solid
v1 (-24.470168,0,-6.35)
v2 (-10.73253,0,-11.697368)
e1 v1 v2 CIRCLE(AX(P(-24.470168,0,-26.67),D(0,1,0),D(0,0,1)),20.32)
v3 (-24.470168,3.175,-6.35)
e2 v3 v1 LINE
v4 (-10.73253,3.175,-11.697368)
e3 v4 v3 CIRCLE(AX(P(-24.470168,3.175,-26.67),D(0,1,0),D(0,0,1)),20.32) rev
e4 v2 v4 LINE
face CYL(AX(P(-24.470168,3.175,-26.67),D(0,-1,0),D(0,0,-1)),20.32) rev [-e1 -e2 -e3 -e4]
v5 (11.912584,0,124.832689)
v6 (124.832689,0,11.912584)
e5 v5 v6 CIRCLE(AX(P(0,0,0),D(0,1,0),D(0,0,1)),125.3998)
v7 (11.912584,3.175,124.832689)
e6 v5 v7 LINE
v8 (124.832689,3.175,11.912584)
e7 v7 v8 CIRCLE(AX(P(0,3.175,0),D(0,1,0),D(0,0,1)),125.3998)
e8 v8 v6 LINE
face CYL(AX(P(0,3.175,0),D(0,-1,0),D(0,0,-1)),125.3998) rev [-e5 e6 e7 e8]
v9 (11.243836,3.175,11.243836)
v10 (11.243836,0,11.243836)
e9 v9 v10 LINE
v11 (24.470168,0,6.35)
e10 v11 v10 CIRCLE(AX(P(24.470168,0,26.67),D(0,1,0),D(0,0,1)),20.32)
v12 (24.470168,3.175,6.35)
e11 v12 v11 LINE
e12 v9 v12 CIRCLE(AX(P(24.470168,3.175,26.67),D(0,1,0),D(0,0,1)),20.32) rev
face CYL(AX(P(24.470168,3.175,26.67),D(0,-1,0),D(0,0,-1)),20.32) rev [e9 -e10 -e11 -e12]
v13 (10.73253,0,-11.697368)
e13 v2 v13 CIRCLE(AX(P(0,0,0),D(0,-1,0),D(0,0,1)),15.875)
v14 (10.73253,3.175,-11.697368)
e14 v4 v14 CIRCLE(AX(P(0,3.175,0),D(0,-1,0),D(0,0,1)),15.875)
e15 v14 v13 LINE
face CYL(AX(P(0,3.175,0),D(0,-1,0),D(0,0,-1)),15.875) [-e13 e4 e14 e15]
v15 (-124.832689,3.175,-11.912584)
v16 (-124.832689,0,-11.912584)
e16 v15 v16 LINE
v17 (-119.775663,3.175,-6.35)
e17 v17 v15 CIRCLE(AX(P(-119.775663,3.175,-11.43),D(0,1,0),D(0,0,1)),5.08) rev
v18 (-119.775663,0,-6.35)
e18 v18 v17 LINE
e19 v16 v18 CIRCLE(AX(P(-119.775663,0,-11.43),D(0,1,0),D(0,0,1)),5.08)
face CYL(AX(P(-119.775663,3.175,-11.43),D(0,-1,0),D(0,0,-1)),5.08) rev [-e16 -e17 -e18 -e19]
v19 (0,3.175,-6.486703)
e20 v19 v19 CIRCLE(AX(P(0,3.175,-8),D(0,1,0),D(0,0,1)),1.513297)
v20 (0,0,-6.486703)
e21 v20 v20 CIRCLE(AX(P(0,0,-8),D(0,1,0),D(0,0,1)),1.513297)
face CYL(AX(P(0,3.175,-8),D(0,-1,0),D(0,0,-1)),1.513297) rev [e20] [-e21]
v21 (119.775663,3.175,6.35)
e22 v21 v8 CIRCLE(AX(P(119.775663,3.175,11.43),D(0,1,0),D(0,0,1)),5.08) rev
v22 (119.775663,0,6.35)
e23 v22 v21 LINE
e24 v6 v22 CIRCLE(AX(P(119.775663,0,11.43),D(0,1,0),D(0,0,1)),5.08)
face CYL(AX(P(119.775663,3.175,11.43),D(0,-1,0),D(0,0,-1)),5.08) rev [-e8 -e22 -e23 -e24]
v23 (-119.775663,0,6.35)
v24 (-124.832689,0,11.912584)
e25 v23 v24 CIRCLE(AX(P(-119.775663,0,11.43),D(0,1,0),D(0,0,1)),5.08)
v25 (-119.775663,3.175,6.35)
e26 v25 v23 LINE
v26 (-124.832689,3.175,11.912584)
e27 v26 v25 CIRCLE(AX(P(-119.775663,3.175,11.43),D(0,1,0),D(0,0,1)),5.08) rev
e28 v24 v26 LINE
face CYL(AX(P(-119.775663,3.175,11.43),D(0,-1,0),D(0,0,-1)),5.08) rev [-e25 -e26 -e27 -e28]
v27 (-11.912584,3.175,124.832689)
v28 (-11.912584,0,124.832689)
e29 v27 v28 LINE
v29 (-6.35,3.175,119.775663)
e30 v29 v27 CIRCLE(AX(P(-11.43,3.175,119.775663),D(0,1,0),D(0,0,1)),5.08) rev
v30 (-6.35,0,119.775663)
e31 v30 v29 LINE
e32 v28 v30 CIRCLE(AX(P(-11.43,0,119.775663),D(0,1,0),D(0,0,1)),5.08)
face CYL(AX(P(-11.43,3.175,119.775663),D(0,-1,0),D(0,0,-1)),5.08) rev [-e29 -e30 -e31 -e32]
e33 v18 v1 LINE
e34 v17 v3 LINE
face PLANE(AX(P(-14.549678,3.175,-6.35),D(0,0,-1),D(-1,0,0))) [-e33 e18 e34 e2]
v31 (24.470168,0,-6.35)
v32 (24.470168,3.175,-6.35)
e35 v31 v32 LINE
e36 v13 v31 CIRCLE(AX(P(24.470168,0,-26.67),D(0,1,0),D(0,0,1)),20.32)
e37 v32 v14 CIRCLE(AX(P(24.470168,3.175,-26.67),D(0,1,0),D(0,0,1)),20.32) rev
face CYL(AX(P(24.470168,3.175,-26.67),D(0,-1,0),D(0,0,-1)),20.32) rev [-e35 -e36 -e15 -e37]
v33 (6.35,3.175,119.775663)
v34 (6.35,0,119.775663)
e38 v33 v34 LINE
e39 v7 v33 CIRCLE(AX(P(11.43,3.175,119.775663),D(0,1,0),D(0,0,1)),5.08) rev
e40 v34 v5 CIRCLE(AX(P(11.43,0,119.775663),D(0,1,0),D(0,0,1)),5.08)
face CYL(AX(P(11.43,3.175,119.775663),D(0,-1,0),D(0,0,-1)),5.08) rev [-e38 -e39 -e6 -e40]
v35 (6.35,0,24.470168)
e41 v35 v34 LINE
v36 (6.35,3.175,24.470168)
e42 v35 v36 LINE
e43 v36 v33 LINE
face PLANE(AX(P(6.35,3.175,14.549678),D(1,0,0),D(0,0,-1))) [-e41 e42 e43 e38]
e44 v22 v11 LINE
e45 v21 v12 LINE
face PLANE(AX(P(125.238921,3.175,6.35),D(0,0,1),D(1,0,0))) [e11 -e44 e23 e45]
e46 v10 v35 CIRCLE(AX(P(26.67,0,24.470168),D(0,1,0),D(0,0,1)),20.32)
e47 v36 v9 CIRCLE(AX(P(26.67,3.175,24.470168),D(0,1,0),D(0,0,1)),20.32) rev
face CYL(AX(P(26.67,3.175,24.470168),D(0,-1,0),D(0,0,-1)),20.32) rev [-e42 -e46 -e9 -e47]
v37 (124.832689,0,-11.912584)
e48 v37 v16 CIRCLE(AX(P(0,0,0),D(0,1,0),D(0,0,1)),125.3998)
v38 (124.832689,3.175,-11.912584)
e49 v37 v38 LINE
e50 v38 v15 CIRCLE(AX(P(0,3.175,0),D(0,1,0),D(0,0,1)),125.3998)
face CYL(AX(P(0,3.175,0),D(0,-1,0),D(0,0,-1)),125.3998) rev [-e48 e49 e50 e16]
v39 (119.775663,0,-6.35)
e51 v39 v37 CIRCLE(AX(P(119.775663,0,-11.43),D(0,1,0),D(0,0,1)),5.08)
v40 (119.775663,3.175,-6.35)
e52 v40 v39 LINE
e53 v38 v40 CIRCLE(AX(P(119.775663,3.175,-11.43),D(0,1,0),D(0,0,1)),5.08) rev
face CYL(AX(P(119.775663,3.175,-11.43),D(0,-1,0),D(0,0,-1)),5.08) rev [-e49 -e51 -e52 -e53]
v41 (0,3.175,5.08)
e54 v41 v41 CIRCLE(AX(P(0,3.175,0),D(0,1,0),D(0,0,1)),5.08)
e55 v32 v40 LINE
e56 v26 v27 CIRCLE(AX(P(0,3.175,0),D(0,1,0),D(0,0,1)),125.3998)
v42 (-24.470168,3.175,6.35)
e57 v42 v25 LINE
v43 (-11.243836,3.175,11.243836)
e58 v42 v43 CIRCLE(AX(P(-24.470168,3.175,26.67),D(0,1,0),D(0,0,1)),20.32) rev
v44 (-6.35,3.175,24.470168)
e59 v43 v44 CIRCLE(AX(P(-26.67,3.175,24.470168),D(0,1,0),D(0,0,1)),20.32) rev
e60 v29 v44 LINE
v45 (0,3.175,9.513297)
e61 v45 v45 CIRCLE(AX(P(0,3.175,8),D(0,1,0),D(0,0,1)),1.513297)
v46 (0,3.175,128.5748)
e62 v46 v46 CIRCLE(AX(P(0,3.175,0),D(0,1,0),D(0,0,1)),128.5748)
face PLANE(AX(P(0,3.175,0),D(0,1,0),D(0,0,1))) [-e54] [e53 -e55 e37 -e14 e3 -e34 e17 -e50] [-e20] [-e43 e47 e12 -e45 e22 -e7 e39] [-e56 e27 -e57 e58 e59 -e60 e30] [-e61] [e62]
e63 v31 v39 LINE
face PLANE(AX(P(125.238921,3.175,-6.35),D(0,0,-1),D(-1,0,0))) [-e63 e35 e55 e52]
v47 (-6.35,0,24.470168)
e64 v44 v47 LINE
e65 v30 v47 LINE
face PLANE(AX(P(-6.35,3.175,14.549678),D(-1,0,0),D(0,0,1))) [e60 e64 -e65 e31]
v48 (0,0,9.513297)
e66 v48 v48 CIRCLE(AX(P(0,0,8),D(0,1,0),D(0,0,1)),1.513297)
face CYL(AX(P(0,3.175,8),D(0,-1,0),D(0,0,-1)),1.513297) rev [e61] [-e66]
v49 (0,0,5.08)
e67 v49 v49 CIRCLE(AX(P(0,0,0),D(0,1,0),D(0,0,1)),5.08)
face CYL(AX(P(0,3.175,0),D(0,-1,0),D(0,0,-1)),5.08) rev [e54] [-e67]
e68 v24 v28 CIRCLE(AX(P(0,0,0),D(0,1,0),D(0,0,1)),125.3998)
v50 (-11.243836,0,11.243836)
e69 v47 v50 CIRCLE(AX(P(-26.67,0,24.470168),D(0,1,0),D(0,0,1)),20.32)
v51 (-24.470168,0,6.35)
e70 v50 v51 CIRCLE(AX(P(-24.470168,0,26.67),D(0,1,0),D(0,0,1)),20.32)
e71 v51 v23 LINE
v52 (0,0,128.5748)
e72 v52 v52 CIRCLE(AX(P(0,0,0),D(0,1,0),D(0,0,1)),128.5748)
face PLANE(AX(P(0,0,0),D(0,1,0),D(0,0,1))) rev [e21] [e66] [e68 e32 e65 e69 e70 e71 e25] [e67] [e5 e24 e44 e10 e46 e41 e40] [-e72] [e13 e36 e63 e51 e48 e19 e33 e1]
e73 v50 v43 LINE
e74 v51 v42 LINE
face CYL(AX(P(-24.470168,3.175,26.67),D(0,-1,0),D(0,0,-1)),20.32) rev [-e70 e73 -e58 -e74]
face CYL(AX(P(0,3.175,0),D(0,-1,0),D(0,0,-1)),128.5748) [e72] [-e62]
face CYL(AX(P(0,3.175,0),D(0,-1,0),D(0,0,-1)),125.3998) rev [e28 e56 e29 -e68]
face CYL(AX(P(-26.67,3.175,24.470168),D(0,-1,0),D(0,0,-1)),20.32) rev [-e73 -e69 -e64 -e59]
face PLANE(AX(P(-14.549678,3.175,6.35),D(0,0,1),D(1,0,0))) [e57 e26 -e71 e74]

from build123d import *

# Parameters (mm, degrees)
SKETCH4_R           = 128.5748
BOSS_EXTRUDE1_DEPTH = 3.175
CUT_EXTRUDE2_DEPTH  = 182.859943404
SCREW_HOLES_R       = 1.513296856
SCREW_HOLES_R_2     = 5.08
MIDDLE_HOLES_DEPTH  = 182.859943404
FILLETMIDDLE_R      = 20.32
FILLETSIDES_R       = 5.08


with BuildPart() as part:
    # Sketch4 → Boss-Extrude1 (new body)
    with BuildSketch(Plane(origin=(0, 0, 0), x_dir=(1, 0, 0), z_dir=(0, 1, 0))):
        with Locations(Location((0, 0, 0), (0, 0, 270))):
            Circle(SKETCH4_R)
    extrude(amount=BOSS_EXTRUDE1_DEPTH)

    # Sketch1 → Cut-Extrude2 (cut, through all)
    with BuildSketch(Plane(origin=(0, 0, 0), x_dir=(1, 0, 0), z_dir=(0, 1, 0))):
        with BuildLine():
            Line((-14.549677831, 6.35), (-125.238921027, 6.35))
            ThreePointArc((-125.238921027, 6.35), (0, 125.3998), (125.238921027, 6.35))
            Line((125.238921027, 6.35), (14.549677831, 6.35))
            ThreePointArc((14.549677831, 6.35), (0, 15.875), (-14.549677831, 6.35))
        make_face()
        with BuildLine():
            Line((125.238921027, -6.35), (14.549677831, -6.35))
            ThreePointArc((14.549677831, -6.35), (11.225320151, -11.225320151), (6.35, -14.549677831))
            Line((6.35, -14.549677831), (6.35, -125.238921027))
            ThreePointArc((6.35, -125.238921027), (88.671048939, -88.671048939), (125.238921027, -6.35))
        make_face()
        with BuildLine():
            Line((-6.35, -14.549677831), (-6.35, -125.238921027))
            ThreePointArc((-6.35, -125.238921027), (-88.671048939, -88.671048939), (-125.238921027, -6.35))
            Line((-125.238921027, -6.35), (-14.549677831, -6.35))
            ThreePointArc((-14.549677831, -6.35), (-11.225320151, -11.225320151), (-6.35, -14.549677831))
        make_face()
    extrude(amount=CUT_EXTRUDE2_DEPTH, mode=Mode.SUBTRACT)

    # Screw holes → middle holes (cut, through all)
    with BuildSketch(Plane(origin=(0, 0, 0), x_dir=(1, 0, 0), z_dir=(0, 1, 0))):
        with Locations(Location((0, 8, 0), (0, 0, 270))):
            Circle(SCREW_HOLES_R)
        with Locations(Location((0, -8, 0), (0, 0, 270))):
            Circle(SCREW_HOLES_R)
        with Locations(Location((0, 0, 0), (0, 0, 270))):
            Circle(SCREW_HOLES_R_2)
    extrude(amount=MIDDLE_HOLES_DEPTH, mode=Mode.SUBTRACT)

    # Filletmiddle
    # the kernel refuses this fillet: 20.32 mm, written as the material it adds along each edge
    with BuildSketch(Plane(origin=(-14.549677831, 0, -6.35), x_dir=(-1, 0, 0), z_dir=(0, 1, 0)), Plane(origin=(14.549677831, 0, 6.35), x_dir=(1, 0, 0), z_dir=(0, 1, 0)), Plane(origin=(-6.35, 0, 14.549677831), x_dir=(0, 0, 1), z_dir=(0, 1, 0))) as filletmiddle_piece_1:
        with BuildLine():
            CenterArc((9.920490231, -20.32), FILLETMIDDLE_R, 90, 42.536898363)
            ThreePointArc((-3.81714798, -5.347368421), (-1.628915718, -2.873314556), (0, 0))
            Line((0, 0), (9.920490231, 0))
        make_face()
    extrude(amount=3.175)
    with BuildSketch(Plane(origin=(14.549677831, 0, -6.35), x_dir=(1, 0, 0), z_dir=(0, 1, 0)), Plane(origin=(-14.549677831, 0, 6.35), x_dir=(-1, 0, 0), z_dir=(0, 1, 0))) as filletmiddle_piece_2:
        with BuildLine():
            CenterArc((9.920490231, 20.32), FILLETMIDDLE_R, 227.463101637, 42.536898363)
            ThreePointArc((-3.81714798, 5.347368421), (-1.628915718, 2.873314556), (0, 0))
            Line((0, 0), (9.920490231, 0))
        make_face()
    extrude(amount=3.175)
    with BuildSketch(Plane(origin=(6.35, 0, 14.549677831), x_dir=(0.8139062748674819, 0, -0.580996192527403), z_dir=(0, 1, 0))) as filletmiddle_piece_3:
        with BuildLine():
            CenterArc((10.774808453, -19.880191881), FILLETMIDDLE_R, 101.942461579, 42.536898363)
            Line((-5.763767052, -8.074349249), (0, 0))
            ThreePointArc((0, 0), (3.285002577, -0.343600093), (6.570005154, 0))
        make_face()
    extrude(amount=3.175)

    # Filletsides
    filletsides_edges = [part.edges().sort_by_distance(p)[0] for p in [
        (125.238921027, 1.5875, -6.35),
        (-125.238921027, 1.5875, -6.35),
        (6.35, 1.5875, 125.238921027),
        (125.238921027, 1.5875, 6.35),
        (-125.238921027, 1.5875, 6.35),
        (-6.35, 1.5875, 125.238921027),
    ]]
    fillet(filletsides_edges, radius=FILLETSIDES_R)


solid = part.part
